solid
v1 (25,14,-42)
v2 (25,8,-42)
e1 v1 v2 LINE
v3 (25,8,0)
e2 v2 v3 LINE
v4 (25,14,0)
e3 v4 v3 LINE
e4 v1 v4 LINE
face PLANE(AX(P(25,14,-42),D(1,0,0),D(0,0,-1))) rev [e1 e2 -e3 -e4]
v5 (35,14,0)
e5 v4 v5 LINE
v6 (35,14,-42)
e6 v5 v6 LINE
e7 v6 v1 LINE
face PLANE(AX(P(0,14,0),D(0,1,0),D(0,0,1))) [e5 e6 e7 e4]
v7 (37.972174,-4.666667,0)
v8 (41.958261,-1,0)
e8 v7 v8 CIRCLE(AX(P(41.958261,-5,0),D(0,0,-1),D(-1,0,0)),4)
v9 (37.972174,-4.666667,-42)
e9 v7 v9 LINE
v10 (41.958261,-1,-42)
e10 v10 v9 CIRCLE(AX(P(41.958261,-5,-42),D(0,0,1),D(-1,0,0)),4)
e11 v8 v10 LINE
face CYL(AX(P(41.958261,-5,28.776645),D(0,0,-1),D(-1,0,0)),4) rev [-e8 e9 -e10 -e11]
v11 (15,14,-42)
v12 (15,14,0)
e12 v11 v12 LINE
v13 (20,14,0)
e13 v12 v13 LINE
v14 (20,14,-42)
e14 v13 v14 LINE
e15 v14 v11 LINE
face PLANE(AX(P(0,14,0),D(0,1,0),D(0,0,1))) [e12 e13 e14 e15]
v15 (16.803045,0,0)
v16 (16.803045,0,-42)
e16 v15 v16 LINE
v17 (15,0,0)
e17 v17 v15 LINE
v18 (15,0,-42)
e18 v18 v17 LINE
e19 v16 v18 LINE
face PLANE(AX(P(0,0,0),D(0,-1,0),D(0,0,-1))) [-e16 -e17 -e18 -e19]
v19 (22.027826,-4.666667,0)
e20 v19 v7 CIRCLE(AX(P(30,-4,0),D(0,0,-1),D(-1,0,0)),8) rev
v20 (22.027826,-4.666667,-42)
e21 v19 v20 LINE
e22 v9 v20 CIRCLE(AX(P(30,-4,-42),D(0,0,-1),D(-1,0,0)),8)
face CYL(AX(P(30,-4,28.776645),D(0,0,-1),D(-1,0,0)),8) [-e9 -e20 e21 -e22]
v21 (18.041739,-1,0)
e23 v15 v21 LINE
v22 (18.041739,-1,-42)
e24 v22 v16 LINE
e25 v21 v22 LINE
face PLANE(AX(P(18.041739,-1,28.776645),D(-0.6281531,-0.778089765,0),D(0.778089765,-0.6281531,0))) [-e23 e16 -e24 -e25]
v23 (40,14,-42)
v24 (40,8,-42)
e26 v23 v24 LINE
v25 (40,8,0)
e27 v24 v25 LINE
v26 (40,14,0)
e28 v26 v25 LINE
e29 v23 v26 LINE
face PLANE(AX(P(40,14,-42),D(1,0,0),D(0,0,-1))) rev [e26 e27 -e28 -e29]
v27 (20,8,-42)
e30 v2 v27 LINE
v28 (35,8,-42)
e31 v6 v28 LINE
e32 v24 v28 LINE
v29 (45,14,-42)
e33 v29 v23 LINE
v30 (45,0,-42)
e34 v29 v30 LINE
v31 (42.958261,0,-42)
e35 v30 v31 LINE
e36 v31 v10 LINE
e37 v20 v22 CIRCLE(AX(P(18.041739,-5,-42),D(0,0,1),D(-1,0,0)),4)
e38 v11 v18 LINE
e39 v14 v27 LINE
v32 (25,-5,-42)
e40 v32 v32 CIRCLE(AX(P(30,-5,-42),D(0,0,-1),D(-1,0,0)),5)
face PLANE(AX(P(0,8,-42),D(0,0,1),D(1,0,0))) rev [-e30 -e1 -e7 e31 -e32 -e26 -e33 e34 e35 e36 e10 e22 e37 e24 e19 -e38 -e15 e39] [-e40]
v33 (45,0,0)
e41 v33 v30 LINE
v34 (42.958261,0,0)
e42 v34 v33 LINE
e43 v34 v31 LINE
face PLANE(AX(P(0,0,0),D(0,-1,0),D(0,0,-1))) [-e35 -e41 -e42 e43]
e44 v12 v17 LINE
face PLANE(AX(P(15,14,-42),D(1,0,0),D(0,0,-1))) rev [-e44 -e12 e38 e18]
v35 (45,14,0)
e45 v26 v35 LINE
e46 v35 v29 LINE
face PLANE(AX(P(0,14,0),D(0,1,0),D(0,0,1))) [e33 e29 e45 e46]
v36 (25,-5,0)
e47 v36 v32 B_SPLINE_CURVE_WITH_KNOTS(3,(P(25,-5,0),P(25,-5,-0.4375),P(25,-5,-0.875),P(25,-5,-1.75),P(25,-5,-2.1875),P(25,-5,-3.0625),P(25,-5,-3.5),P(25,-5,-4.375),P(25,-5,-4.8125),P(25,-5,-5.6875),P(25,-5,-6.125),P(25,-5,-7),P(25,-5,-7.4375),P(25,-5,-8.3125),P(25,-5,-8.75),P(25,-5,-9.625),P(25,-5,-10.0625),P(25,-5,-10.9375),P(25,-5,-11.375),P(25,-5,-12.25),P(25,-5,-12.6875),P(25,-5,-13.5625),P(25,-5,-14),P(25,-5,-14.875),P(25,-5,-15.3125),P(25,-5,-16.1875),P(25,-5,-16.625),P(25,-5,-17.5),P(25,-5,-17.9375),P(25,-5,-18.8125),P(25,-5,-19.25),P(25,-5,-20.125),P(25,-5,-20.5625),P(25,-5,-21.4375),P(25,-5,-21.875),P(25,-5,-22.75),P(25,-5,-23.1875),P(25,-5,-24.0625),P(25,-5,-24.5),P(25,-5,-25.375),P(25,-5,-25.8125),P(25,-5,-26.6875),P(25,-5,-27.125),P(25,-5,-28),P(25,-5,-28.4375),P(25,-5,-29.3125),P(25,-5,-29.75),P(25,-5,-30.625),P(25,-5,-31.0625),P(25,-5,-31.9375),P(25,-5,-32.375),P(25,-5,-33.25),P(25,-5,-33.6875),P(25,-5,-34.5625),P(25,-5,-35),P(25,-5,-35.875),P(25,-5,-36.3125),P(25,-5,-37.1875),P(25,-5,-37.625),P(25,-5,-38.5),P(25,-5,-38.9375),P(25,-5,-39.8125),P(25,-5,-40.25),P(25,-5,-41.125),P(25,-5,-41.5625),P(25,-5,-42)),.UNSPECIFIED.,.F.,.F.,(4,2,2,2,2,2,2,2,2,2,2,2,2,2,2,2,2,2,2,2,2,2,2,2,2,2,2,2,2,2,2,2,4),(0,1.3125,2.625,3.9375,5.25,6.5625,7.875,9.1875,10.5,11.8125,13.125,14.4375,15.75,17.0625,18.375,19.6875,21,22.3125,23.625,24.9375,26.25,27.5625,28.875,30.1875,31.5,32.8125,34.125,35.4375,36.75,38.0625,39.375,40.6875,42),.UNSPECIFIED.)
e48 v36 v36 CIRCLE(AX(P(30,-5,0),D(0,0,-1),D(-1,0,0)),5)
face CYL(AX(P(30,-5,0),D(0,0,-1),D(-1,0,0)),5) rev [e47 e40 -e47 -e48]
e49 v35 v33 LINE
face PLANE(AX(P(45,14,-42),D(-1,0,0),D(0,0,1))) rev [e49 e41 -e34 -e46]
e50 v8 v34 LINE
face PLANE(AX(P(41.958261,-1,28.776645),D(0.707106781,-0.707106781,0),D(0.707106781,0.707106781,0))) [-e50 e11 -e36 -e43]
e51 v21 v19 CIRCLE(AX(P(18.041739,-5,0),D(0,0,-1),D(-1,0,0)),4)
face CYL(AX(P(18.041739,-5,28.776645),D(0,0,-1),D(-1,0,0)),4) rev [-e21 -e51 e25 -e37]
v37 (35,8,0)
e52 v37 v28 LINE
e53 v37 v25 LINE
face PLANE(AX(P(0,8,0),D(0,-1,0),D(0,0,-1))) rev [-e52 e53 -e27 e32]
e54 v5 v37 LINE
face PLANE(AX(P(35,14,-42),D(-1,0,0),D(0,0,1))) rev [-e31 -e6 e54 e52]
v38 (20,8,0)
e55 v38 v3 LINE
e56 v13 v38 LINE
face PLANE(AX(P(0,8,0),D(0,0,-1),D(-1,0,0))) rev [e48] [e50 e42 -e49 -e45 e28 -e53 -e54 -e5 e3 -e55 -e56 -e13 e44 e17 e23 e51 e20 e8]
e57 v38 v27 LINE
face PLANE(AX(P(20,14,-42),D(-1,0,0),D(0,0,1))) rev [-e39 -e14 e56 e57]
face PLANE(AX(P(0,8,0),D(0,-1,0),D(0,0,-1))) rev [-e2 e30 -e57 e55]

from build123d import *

# Parameters (mm, degrees)
SKETCH1_W           = 60
SKETCH1_H           = 42
BOSS_EXTRUDE1_DEPTH = 8
SKETCH3_W           = 10
SKETCH3_H           = 42
BOSS_EXTRUDE5_DEPTH = 6
SKETCH5_W           = 14
SKETCH5_H           = 42
BOSS_EXTRUDE6_DEPTH = 11
SKETCH6_R           = 5
CUT_EXTRUDE1_DEPTH  = 75.565407529
FILLET1_R           = 7
FILLET2_R           = 5
FILLET3_R           = 5
BOSS_EXTRUDE7_DEPTH = 42
SKETCH9_W           = 5
SKETCH9_H           = 42
BOSS_EXTRUDE8_DEPTH = 6
SKETCH11_W          = 15
SKETCH11_H          = 42
CUT_EXTRUDE2_DEPTH  = 76.921011584


with BuildPart() as part:
    # Sketch1 → Boss-Extrude1 (new body)
    with BuildSketch(Plane(origin=(0, 0, 0), x_dir=(1, 0, 0), z_dir=(0, 1, 0))):
        with Locations((30, 21)):
            Rectangle(SKETCH1_W, SKETCH1_H)
    extrude(amount=BOSS_EXTRUDE1_DEPTH)

    # Sketch3 → Boss-Extrude5 (add)
    with BuildSketch(Plane(origin=(0, 8, 0), x_dir=(1, 0, 0), z_dir=(0, 1, 0))):
        with Locations((30, 21)):
            Rectangle(SKETCH3_W, SKETCH3_H)
    extrude(amount=BOSS_EXTRUDE5_DEPTH)

    # Sketch5 → Boss-Extrude6 (add)
    with BuildSketch(Plane.XZ):
        with Locations((30, -21)):
            Rectangle(SKETCH5_W, SKETCH5_H)
    extrude(amount=BOSS_EXTRUDE6_DEPTH)

    # Sketch6 → Cut-Extrude1 (cut, through all)
    with BuildSketch(Plane(origin=(0, 0, -42), x_dir=(-1, 0, 0), z_dir=(0, 0, -1))):
        with Locations((-30, -5)):
            Circle(SKETCH6_R)
    extrude(amount=-CUT_EXTRUDE1_DEPTH, mode=Mode.SUBTRACT)

    # Fillet1
    fillet1_edges = [part.edges().sort_by_distance(p)[0] for p in [
        (23, -11, -21),
        (37, -11, -21),
    ]]
    fillet(fillet1_edges, radius=FILLET1_R - 0.0001)  # a hair under: the kernel refuses the full size

    # Fillet2
    fillet2_edges = [part.edges().sort_by_distance(p)[0] for p in [
        (23, 0, -21),
    ]]
    fillet(fillet2_edges, radius=FILLET2_R)

    # Fillet3
    fillet3_edges = [part.edges().sort_by_distance(p)[0] for p in [
        (37, 0, -21),
    ]]
    fillet(fillet3_edges, radius=FILLET3_R)

    # Sketch8 → Boss-Extrude7 (add)
    with BuildSketch(Plane(origin=(0, 0, -42), x_dir=(-1, 0, 0), z_dir=(0, 0, -1))):
        with BuildLine():
            Line((-41.958260743, -1), (-42.958260743, 0))
            Line((-42.958260743, 0), (-41.958260743, 0))
            ThreePointArc((-41.958260743, 0), (-38.573244741, -1.320099639), (-36.9756521, -4.583333333))
            ThreePointArc((-36.9756521, -4.583333333), (-34.739022403, -9.151860505), (-30, -11))
            ThreePointArc((-30, -11), (-25.260977597, -9.151860505), (-23.0243479, -4.583333333))
            ThreePointArc((-23.0243479, -4.583333333), (-21.426755259, -1.320099639), (-18.041739257, 0))
            Line((-18.041739257, 0), (-16.803044796, 0))
            Line((-16.803044796, 0), (-18.041739257, -1))
            ThreePointArc((-18.041739257, -1), (-20.749752058, -2.056079711), (-22.027826171, -4.666666667))
            ThreePointArc((-22.027826171, -4.666666667), (-24.583974397, -9.887840578), (-30, -12))
            ThreePointArc((-30, -12), (-35.416025603, -9.887840578), (-37.972173829, -4.666666667))
            ThreePointArc((-37.972173829, -4.666666667), (-39.250247942, -2.056079711), (-41.958260743, -1))
        make_face()
    extrude(amount=-BOSS_EXTRUDE7_DEPTH)

    # Sketch9 → Boss-Extrude8 (add)
    with BuildSketch(Plane(origin=(0, 8, 0), x_dir=(1, 0, 0), z_dir=(0, 1, 0))):
        with Locations((42.5, 21)):
            Rectangle(SKETCH9_W, SKETCH9_H)
        with Locations((17.5, 21)):
            Rectangle(SKETCH9_W, SKETCH9_H)
    extrude(amount=BOSS_EXTRUDE8_DEPTH)

    # Sketch11 → Cut-Extrude2 (cut, through all)
    with BuildSketch(Plane(origin=(0, 8, 0), x_dir=(1, 0, 0), z_dir=(0, 1, 0))):
        with Locations((52.5, 21)):
            Rectangle(SKETCH11_W, SKETCH11_H)
        with Locations((7.5, 21)):
            Rectangle(SKETCH11_W, SKETCH11_H)
    extrude(amount=-CUT_EXTRUDE2_DEPTH, mode=Mode.SUBTRACT)


solid = part.part
